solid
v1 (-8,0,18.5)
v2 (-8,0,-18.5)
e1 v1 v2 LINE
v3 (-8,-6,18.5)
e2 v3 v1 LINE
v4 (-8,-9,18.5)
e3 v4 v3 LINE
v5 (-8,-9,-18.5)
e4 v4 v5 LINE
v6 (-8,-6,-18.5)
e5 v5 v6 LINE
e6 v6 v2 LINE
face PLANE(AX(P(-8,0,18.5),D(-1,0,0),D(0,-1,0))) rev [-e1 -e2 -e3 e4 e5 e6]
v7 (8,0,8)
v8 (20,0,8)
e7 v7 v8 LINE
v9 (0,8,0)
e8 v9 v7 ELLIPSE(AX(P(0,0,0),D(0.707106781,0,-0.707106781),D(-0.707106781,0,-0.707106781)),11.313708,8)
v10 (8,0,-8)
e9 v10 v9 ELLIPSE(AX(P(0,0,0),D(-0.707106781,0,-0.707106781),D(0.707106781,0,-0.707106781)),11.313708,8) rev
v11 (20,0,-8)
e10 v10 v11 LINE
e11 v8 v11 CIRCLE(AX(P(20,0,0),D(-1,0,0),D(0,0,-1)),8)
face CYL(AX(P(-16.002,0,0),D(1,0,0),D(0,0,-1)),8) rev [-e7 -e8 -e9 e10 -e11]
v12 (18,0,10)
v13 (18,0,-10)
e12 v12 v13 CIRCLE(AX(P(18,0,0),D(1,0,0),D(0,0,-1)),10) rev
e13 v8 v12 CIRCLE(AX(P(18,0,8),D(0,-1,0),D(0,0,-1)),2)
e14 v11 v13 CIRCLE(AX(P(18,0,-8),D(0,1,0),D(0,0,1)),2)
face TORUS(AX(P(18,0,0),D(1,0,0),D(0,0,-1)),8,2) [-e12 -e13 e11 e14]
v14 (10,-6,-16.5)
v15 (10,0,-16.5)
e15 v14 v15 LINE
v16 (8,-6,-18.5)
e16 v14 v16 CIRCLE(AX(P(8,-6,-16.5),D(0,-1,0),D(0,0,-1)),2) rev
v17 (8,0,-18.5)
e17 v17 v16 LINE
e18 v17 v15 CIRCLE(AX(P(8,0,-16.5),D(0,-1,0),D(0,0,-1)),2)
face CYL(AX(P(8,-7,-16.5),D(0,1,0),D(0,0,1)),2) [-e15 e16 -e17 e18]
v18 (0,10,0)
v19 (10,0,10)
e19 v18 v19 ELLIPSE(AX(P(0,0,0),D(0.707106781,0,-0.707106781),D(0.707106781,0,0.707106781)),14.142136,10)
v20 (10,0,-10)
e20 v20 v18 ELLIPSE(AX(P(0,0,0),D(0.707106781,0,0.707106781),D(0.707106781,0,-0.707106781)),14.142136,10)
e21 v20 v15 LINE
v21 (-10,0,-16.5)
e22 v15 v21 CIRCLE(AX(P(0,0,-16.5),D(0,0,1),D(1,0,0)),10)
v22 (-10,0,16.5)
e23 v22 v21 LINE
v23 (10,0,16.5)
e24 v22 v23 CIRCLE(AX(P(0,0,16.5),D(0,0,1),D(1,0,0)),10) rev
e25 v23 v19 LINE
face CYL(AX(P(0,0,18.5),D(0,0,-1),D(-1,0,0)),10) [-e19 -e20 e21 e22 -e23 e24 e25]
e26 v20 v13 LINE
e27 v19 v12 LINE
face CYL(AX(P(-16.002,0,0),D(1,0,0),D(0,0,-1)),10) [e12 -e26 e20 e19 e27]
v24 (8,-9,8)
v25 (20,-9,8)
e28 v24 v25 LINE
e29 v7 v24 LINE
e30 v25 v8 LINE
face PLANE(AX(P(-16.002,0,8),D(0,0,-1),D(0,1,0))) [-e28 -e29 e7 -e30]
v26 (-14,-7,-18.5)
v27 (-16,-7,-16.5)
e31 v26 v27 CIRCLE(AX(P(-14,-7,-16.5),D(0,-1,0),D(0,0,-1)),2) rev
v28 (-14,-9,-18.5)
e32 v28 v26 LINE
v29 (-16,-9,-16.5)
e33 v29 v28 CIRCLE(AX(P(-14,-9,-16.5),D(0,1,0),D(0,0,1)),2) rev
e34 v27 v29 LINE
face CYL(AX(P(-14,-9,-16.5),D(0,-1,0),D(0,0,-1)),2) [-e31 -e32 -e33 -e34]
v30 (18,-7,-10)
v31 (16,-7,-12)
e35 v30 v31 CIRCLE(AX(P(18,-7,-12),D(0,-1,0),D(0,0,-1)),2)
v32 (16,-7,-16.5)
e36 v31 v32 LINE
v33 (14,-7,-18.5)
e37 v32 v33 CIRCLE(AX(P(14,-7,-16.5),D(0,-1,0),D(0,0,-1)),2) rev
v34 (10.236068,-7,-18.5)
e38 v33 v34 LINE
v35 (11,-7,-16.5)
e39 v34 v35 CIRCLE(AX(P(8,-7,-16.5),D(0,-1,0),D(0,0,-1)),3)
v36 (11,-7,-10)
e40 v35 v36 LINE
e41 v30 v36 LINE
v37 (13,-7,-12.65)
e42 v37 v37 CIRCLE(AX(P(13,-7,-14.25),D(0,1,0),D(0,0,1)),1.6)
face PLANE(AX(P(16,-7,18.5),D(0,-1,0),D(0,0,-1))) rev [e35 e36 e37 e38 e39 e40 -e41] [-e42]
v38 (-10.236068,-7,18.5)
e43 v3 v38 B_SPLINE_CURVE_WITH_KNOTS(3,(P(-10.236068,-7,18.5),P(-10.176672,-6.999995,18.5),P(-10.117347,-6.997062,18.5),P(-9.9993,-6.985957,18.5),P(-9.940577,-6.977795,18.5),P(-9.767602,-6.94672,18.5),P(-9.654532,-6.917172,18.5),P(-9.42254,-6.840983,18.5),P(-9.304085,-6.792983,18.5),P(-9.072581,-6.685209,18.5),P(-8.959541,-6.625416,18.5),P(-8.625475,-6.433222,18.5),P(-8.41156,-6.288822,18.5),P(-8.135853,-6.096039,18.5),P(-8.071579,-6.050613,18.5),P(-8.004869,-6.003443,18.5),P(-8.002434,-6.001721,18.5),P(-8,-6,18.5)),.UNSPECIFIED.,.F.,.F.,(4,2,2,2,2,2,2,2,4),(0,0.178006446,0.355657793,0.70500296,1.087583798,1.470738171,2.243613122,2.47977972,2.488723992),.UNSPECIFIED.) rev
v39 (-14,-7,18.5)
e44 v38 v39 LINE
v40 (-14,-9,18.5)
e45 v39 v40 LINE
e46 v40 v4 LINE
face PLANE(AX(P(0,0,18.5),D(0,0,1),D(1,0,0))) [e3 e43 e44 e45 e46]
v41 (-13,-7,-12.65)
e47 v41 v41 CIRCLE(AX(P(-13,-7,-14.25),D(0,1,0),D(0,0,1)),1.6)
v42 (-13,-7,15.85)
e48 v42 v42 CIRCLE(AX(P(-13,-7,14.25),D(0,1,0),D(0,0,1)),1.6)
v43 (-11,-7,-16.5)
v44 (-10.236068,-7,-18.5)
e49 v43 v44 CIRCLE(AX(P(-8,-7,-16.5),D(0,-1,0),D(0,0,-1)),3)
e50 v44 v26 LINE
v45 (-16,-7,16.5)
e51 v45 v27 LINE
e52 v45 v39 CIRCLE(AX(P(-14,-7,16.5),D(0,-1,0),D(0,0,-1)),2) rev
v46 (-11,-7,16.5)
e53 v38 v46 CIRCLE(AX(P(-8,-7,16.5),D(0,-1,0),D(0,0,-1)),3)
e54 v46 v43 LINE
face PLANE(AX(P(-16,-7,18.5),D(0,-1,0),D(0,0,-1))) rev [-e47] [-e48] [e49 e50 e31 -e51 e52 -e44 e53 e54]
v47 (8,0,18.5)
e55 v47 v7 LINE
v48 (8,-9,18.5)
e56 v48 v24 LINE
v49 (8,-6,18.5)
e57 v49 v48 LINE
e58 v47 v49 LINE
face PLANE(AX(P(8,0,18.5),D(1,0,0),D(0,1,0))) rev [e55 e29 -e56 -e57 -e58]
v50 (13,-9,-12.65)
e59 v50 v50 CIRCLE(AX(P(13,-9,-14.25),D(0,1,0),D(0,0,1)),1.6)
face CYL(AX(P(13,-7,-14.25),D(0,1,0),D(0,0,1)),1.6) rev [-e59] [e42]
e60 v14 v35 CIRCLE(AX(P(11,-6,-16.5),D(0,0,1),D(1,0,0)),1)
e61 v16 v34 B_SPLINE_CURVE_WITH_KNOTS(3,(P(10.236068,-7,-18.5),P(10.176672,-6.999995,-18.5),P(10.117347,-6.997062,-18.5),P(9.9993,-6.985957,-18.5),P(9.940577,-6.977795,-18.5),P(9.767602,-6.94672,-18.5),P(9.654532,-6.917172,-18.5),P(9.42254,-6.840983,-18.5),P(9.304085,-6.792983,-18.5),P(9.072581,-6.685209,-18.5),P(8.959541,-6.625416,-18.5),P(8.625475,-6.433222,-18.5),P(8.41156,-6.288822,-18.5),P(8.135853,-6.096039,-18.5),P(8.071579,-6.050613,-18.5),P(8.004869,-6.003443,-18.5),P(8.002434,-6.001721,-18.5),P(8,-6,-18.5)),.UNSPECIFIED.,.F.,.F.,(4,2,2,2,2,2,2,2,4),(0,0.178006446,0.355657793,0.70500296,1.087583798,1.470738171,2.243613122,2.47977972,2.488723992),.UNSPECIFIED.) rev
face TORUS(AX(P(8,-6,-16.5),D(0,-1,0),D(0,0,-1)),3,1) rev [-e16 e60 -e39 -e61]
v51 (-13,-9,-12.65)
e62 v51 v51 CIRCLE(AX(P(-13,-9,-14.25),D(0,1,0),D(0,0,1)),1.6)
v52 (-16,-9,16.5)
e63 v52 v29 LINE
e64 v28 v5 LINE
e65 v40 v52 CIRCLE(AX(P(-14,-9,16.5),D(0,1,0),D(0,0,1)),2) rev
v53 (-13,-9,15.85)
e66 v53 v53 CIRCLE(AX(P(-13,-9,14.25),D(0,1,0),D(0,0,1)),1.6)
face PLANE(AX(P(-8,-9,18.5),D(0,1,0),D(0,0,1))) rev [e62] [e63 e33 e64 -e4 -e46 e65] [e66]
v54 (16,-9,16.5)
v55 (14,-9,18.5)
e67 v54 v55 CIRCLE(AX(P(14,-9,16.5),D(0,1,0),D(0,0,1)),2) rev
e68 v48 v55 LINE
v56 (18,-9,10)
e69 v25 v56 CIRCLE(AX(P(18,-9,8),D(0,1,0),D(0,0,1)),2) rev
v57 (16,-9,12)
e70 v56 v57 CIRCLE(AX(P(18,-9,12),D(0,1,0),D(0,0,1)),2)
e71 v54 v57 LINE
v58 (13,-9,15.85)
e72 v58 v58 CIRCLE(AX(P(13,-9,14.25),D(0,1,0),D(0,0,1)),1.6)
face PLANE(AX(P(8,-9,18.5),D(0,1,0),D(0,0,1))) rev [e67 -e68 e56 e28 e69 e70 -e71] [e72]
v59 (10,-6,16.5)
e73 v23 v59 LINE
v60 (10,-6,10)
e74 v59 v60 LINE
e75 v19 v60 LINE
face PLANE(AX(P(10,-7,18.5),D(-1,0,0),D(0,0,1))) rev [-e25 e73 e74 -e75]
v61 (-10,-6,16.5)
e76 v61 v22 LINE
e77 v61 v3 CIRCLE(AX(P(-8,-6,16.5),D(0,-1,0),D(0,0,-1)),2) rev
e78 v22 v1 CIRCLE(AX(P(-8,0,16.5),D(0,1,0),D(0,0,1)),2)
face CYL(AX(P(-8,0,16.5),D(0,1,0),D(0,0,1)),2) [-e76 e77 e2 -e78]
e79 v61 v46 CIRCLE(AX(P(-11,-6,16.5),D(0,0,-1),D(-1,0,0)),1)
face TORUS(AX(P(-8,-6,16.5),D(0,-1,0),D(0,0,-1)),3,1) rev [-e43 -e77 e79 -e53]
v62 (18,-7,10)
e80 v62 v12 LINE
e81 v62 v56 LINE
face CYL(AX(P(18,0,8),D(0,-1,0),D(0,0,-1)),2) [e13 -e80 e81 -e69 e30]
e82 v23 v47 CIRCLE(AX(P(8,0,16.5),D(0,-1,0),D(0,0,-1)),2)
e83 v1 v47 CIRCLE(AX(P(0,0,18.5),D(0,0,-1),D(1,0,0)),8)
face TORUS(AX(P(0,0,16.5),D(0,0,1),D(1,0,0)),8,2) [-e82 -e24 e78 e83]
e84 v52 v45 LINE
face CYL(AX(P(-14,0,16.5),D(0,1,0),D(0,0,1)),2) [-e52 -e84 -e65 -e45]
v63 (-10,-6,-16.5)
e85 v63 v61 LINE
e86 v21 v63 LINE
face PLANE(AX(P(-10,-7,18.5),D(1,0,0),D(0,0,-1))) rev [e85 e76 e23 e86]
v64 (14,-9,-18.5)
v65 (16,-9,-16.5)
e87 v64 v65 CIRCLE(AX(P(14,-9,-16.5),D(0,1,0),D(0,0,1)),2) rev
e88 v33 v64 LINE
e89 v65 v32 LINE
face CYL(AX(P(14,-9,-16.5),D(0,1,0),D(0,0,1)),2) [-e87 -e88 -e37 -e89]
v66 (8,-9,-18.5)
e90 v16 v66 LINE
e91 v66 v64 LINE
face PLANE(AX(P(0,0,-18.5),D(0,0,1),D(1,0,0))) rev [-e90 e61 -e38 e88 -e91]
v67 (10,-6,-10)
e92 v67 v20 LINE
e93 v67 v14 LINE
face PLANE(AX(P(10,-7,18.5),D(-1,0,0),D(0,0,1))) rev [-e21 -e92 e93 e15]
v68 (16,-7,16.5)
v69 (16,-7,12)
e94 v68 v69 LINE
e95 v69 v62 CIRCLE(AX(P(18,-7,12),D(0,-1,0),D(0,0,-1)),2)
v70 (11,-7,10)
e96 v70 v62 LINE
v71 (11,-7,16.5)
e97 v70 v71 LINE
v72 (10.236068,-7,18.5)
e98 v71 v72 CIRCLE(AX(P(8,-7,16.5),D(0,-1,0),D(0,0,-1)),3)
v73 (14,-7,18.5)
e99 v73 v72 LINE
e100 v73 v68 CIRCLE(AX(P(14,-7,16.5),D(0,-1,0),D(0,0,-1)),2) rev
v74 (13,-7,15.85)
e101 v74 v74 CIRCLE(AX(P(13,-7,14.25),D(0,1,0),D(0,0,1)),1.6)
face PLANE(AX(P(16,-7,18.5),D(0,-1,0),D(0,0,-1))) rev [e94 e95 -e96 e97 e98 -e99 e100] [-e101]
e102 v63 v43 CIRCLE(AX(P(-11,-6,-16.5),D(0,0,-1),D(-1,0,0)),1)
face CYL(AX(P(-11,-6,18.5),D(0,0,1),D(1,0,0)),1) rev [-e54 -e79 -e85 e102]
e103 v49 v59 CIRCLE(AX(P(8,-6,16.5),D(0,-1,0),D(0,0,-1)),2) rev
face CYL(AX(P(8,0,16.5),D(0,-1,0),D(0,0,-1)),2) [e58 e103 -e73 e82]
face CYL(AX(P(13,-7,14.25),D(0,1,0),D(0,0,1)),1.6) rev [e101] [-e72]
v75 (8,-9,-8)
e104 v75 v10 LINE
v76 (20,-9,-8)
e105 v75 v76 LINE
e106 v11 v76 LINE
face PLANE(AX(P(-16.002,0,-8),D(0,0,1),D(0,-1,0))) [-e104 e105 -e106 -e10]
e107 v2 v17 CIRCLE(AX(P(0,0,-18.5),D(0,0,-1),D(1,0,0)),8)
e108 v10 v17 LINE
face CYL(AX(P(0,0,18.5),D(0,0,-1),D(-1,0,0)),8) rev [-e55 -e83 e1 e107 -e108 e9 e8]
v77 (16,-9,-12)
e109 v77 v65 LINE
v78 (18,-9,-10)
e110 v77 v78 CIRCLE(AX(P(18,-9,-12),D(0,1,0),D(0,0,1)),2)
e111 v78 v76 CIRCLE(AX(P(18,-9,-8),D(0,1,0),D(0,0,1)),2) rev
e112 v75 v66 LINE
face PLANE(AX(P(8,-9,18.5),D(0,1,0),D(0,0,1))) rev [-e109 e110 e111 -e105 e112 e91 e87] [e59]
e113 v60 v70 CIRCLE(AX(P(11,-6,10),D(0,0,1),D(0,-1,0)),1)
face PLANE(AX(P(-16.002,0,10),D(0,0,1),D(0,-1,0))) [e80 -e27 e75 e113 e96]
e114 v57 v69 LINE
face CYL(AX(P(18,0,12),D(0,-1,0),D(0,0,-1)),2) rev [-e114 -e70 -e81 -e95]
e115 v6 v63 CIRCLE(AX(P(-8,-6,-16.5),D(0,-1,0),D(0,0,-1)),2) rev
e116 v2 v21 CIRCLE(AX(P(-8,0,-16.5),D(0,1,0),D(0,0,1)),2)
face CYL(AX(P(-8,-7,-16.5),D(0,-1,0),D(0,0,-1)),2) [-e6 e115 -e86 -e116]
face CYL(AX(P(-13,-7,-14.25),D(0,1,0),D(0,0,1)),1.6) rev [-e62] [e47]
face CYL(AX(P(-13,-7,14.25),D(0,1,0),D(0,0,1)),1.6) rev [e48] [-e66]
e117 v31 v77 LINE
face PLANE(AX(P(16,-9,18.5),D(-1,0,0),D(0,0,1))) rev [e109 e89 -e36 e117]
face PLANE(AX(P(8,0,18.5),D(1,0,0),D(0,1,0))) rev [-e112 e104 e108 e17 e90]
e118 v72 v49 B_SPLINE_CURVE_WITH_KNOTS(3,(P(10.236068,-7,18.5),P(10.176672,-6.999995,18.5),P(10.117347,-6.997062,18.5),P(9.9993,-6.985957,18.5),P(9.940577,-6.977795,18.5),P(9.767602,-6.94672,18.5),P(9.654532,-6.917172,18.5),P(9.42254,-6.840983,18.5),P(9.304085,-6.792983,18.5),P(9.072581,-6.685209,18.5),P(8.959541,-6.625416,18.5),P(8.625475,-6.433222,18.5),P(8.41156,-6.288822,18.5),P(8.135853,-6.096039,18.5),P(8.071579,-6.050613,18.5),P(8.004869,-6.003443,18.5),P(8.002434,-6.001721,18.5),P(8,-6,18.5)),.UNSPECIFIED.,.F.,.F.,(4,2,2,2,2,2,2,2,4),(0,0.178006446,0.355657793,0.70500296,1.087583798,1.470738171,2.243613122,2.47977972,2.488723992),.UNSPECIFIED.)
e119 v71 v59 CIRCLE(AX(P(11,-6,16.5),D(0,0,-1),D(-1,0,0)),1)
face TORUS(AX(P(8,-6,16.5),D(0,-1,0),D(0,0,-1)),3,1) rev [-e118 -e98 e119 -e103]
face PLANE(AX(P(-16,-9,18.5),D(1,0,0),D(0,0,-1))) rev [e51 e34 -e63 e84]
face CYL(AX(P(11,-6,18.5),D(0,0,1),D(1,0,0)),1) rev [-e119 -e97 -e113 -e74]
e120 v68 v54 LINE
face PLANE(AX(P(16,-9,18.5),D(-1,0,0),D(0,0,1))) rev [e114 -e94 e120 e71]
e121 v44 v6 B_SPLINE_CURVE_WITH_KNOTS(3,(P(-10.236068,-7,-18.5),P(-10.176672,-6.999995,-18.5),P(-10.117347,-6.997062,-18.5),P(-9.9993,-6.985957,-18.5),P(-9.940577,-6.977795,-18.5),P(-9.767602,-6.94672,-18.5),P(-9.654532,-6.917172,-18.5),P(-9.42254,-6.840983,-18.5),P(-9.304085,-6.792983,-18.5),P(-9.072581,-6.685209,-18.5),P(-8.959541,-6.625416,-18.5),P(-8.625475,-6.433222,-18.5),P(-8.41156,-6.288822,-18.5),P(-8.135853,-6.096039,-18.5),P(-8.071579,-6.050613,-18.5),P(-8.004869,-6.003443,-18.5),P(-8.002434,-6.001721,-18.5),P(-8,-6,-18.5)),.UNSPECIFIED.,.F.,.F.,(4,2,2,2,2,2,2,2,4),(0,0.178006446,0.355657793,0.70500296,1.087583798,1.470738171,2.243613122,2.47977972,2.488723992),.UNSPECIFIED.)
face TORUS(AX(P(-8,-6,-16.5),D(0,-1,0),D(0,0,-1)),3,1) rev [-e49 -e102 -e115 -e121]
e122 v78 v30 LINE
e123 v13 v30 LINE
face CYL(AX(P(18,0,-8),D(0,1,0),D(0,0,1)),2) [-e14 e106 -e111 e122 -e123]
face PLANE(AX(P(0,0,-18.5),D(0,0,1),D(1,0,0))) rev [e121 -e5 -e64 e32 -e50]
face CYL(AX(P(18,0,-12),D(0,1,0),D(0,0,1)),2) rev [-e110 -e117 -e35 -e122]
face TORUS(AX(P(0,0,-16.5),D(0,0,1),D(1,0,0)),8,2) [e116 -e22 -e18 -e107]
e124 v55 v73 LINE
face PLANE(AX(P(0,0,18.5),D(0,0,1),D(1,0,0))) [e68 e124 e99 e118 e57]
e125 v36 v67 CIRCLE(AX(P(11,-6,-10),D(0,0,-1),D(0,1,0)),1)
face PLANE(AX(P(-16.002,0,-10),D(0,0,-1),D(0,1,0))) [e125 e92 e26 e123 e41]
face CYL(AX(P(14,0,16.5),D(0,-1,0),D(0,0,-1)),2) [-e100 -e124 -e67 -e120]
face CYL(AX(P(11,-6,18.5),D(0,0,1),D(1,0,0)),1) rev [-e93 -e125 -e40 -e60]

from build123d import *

# Parameters (mm, degrees)
BOSS_EXTRUDE2_DEPTH  = 18.5
M3_CLEARANCE_HOLE1_D = 3.2
BOSS_EXTRUDE3_REACH  = 43.692
CUT_EXTRUDE1_REACH   = 43.692
FILLET1_R            = 2
FILLET2_R            = 1


# Some blends are built 0.0001 mm under size
with BuildPart() as part:
    # Sketch2 → Boss-Extrude2 (new, symmetric)
    with BuildSketch(Plane.XY):
        with BuildLine():
            Line((-8, 0), (-8, -9))
            Line((-8, -9), (-16, -9))
            Line((-16, -9), (-16, -7))
            Line((-16, -7), (-10, -7))
            Line((-10, -7), (-10, 0))
            ThreePointArc((-10, 0), (0, 10), (10, 0))
            Line((10, 0), (10, -7))
            Line((10, -7), (16, -7))
            Line((16, -7), (16, -9))
            Line((16, -9), (8, -9))
            Line((8, -9), (8, 0))
            ThreePointArc((8, 0), (0, 8), (-8, 0))
        make_face()
    extrude(amount=BOSS_EXTRUDE2_DEPTH, both=True)

    # M3 Clearance Hole1 (through all)
    with Locations(Plane(origin=(0, -7, 0), x_dir=(1, 0, 0), z_dir=(0, 1, 0))):
        with Locations((-13, 14.25), (13, 14.25), (13, -14.25), (-13, -14.25)):
            Hole(M3_CLEARANCE_HOLE1_D / 2)

    # Sketch6 → Boss-Extrude3 (add, up to next)
    with BuildSketch(Plane(origin=(20, 0, 0), x_dir=(0, 0, -1), z_dir=(1, 0, 0)), mode=Mode.PRIVATE) as boss_extrude3_sk1:
        with BuildLine():
            Line((-8, 0), (-8, -9))
            Line((-8, -9), (-10, -9))
            Line((-10, -9), (-10, 0))
            ThreePointArc((-10, 0), (0, 10), (10, 0))
            Line((10, 0), (10, -9))
            Line((10, -9), (8, -9))
            Line((8, -9), (8, 0))
            ThreePointArc((8, 0), (0, 8), (-8, 0))
        make_face()
    boss_extrude3_tool1 = extrude(boss_extrude3_sk1.sketch, amount=-BOSS_EXTRUDE3_REACH, mode=Mode.PRIVATE) - part.part
    add(boss_extrude3_tool1.solids().sort_by_distance((20, -4.5, -9.724138))[0])

    # Sketch7 → Cut-Extrude1 (cut, up to next)
    with BuildSketch(Plane(origin=(20, 0, 0), x_dir=(0, 0, -1), z_dir=(1, 0, 0)), mode=Mode.PRIVATE) as cut_extrude1_sk1:
        with BuildLine():
            Line((8, 0), (8, -7))
            Line((8, -7), (8, -9))
            Line((8, -9), (-8, -9))
            Line((-8, -9), (-8, -7))
            Line((-8, -7), (-8, 0))
            ThreePointArc((-8, 0), (0, 8), (8, 0))
        make_face()
    cut_extrude1_tool1 = extrude(cut_extrude1_sk1.sketch, amount=-CUT_EXTRUDE1_REACH, mode=Mode.PRIVATE) & part.part
    add(cut_extrude1_tool1.solids().sort_by_distance((20, -1.254102, 0))[0], mode=Mode.SUBTRACT)

    # Fillet1
    fillet1_edges = [part.edges().sort_by_distance(p)[0] for p in [
        (16, -8, -10),
        (16, -8, 10),
        (16, -8, 18.5),
        (16, -8, -18.5),
        (-16, -8, 18.5),
        (-16, -8, -18.5),
        (20, -4.5, 10),
        (20, 10, 0),
        (20, -4.5, -10),
        (10, -3.5, -18.5),
        (-10, -3.5, -18.5),
        (10, -3.5, 18.5),
        (-10, -3.5, 18.5),
        (0, 10, -18.5),
        (0, 10, 18.5),
    ]]
    fillet(fillet1_edges, radius=FILLET1_R - 0.0001)  # a hair under: the kernel refuses the full size

    # Fillet2
    # the kernel refuses this fillet: 1 mm, written as the material it adds along each edge
    with BuildSketch(Plane(origin=(-10, -7, 16.5001), x_dir=(0, 1, 0), z_dir=(0, 0, -1))) as fillet2_piece_1:
        with BuildLine():
            CenterArc((FILLET2_R, -FILLET2_R), FILLET2_R, 90, 90)
            Line((0, -FILLET2_R), (0, 0))
            Line((0, 0), (FILLET2_R, 0))
        make_face()
    extrude(amount=33.0002)
    with BuildSketch(Plane(origin=(10, -7, 16.5001), x_dir=(0, 1, 0), z_dir=(0, 0, -1)), Plane(origin=(10, -7, -10), x_dir=(0, 1, 0), z_dir=(0, 0, -1))) as fillet2_piece_2:
        with BuildLine():
            CenterArc((FILLET2_R, FILLET2_R), FILLET2_R, 180, 90)
            Line((0, FILLET2_R), (0, 0))
            Line((0, 0), (FILLET2_R, 0))
        make_face()
    extrude(amount=6.5001)
    with BuildSketch(Plane(origin=(8.0001, -7, -16.5001), x_dir=(1, 0, 0), z_dir=(0, 0, 1))) as fillet2_piece_3_section:
        with BuildLine():
            CenterArc((1.9999 + FILLET2_R, FILLET2_R), FILLET2_R, 180, 90)
            Line((1.9999, FILLET2_R), (1.9999, 0))
            Line((1.9999, 0), (1.9999 + FILLET2_R, 0))
        make_face()
    fillet2_piece_3 = revolve(axis=Axis((8.0001, -7, -16.5001), (0, 1, 0)), revolution_arc=161.652077223, mode=Mode.PRIVATE)
    fillet2_piece_3 = split(fillet2_piece_3, bisect_by=Plane(origin=(10.2121031, -6.837361474, -18.5), z_dir=(0, 0, 1)), keep=Keep.TOP, mode=Mode.PRIVATE)
    fillet2_piece_3 = split(fillet2_piece_3, bisect_by=Plane(origin=(8, -6.837361474, -17.073760291), z_dir=(1, 0, 0)), keep=Keep.TOP, mode=Mode.PRIVATE)
    add(fillet2_piece_3)
    with BuildSketch(Plane(origin=(-8.0001, -7, -16.5001), x_dir=(-1, 0, 0), z_dir=(0, 0, 1))) as fillet2_piece_4_section:
        with BuildLine():
            CenterArc((1.9999 + FILLET2_R, -FILLET2_R), FILLET2_R, 90, 90)
            Line((1.9999 + FILLET2_R, 0), (1.9999, 0))
            Line((1.9999, 0), (1.9999, -FILLET2_R))
        make_face()
    fillet2_piece_4 = revolve(axis=Axis((-8.0001, -7, -16.5001), (0, -1, 0)), revolution_arc=161.652077223, mode=Mode.PRIVATE)
    fillet2_piece_4 = split(fillet2_piece_4, bisect_by=Plane(origin=(-8, -6.727847021, -17.962226861), z_dir=(-1, 0, 0)), keep=Keep.TOP, mode=Mode.PRIVATE)
    fillet2_piece_4 = split(fillet2_piece_4, bisect_by=Plane(origin=(-9.462226887, -6.727847021, -18.5), z_dir=(0, 0, 1)), keep=Keep.TOP, mode=Mode.PRIVATE)
    add(fillet2_piece_4)
    with BuildSketch(Plane(origin=(8.0001, -7, 16.5001), x_dir=(-0.949162519062451, 0, 0.3147864552470806), z_dir=(-0.3147864552470806, 0, -0.949162519062451))) as fillet2_piece_5_section:
        with BuildLine():
            CenterArc((1.9999 + FILLET2_R, FILLET2_R), FILLET2_R, 180, 90)
            Line((1.9999, FILLET2_R), (1.9999, 0))
            Line((1.9999, 0), (1.9999 + FILLET2_R, 0))
        make_face()
    fillet2_piece_5 = revolve(axis=Axis((8.0001, -7, 16.5001), (0, 1, 0)), revolution_arc=161.652077223, mode=Mode.PRIVATE)
    fillet2_piece_5 = split(fillet2_piece_5, bisect_by=Plane(origin=(9.462226477, -6.727846247, 18.5), z_dir=(0, 0, -1)), keep=Keep.TOP, mode=Mode.PRIVATE)
    fillet2_piece_5 = split(fillet2_piece_5, bisect_by=Plane(origin=(8, -6.727846247, 17.962227025), z_dir=(1, 0, 0)), keep=Keep.TOP, mode=Mode.PRIVATE)
    add(fillet2_piece_5)
    with BuildSketch(Plane(origin=(-8.0001, -7, 16.5001), x_dir=(0.949162519062451, 0, 0.3147864552470806), z_dir=(0.3147864552470806, 0, -0.949162519062451))) as fillet2_piece_6_section:
        with BuildLine():
            CenterArc((1.9999 + FILLET2_R, -FILLET2_R), FILLET2_R, 90, 90)
            Line((1.9999 + FILLET2_R, 0), (1.9999, 0))
            Line((1.9999, 0), (1.9999, -FILLET2_R))
        make_face()
    fillet2_piece_6 = revolve(axis=Axis((-8.0001, -7, 16.5001), (0, -1, 0)), revolution_arc=161.652077223, mode=Mode.PRIVATE)
    fillet2_piece_6 = split(fillet2_piece_6, bisect_by=Plane(origin=(-9.462226765, -6.727846718, 18.5), z_dir=(0, 0, -1)), keep=Keep.TOP, mode=Mode.PRIVATE)
    fillet2_piece_6 = split(fillet2_piece_6, bisect_by=Plane(origin=(-8, -6.727846718, 17.962226739), z_dir=(-1, 0, 0)), keep=Keep.TOP, mode=Mode.PRIVATE)
    add(fillet2_piece_6)


solid = part.part
